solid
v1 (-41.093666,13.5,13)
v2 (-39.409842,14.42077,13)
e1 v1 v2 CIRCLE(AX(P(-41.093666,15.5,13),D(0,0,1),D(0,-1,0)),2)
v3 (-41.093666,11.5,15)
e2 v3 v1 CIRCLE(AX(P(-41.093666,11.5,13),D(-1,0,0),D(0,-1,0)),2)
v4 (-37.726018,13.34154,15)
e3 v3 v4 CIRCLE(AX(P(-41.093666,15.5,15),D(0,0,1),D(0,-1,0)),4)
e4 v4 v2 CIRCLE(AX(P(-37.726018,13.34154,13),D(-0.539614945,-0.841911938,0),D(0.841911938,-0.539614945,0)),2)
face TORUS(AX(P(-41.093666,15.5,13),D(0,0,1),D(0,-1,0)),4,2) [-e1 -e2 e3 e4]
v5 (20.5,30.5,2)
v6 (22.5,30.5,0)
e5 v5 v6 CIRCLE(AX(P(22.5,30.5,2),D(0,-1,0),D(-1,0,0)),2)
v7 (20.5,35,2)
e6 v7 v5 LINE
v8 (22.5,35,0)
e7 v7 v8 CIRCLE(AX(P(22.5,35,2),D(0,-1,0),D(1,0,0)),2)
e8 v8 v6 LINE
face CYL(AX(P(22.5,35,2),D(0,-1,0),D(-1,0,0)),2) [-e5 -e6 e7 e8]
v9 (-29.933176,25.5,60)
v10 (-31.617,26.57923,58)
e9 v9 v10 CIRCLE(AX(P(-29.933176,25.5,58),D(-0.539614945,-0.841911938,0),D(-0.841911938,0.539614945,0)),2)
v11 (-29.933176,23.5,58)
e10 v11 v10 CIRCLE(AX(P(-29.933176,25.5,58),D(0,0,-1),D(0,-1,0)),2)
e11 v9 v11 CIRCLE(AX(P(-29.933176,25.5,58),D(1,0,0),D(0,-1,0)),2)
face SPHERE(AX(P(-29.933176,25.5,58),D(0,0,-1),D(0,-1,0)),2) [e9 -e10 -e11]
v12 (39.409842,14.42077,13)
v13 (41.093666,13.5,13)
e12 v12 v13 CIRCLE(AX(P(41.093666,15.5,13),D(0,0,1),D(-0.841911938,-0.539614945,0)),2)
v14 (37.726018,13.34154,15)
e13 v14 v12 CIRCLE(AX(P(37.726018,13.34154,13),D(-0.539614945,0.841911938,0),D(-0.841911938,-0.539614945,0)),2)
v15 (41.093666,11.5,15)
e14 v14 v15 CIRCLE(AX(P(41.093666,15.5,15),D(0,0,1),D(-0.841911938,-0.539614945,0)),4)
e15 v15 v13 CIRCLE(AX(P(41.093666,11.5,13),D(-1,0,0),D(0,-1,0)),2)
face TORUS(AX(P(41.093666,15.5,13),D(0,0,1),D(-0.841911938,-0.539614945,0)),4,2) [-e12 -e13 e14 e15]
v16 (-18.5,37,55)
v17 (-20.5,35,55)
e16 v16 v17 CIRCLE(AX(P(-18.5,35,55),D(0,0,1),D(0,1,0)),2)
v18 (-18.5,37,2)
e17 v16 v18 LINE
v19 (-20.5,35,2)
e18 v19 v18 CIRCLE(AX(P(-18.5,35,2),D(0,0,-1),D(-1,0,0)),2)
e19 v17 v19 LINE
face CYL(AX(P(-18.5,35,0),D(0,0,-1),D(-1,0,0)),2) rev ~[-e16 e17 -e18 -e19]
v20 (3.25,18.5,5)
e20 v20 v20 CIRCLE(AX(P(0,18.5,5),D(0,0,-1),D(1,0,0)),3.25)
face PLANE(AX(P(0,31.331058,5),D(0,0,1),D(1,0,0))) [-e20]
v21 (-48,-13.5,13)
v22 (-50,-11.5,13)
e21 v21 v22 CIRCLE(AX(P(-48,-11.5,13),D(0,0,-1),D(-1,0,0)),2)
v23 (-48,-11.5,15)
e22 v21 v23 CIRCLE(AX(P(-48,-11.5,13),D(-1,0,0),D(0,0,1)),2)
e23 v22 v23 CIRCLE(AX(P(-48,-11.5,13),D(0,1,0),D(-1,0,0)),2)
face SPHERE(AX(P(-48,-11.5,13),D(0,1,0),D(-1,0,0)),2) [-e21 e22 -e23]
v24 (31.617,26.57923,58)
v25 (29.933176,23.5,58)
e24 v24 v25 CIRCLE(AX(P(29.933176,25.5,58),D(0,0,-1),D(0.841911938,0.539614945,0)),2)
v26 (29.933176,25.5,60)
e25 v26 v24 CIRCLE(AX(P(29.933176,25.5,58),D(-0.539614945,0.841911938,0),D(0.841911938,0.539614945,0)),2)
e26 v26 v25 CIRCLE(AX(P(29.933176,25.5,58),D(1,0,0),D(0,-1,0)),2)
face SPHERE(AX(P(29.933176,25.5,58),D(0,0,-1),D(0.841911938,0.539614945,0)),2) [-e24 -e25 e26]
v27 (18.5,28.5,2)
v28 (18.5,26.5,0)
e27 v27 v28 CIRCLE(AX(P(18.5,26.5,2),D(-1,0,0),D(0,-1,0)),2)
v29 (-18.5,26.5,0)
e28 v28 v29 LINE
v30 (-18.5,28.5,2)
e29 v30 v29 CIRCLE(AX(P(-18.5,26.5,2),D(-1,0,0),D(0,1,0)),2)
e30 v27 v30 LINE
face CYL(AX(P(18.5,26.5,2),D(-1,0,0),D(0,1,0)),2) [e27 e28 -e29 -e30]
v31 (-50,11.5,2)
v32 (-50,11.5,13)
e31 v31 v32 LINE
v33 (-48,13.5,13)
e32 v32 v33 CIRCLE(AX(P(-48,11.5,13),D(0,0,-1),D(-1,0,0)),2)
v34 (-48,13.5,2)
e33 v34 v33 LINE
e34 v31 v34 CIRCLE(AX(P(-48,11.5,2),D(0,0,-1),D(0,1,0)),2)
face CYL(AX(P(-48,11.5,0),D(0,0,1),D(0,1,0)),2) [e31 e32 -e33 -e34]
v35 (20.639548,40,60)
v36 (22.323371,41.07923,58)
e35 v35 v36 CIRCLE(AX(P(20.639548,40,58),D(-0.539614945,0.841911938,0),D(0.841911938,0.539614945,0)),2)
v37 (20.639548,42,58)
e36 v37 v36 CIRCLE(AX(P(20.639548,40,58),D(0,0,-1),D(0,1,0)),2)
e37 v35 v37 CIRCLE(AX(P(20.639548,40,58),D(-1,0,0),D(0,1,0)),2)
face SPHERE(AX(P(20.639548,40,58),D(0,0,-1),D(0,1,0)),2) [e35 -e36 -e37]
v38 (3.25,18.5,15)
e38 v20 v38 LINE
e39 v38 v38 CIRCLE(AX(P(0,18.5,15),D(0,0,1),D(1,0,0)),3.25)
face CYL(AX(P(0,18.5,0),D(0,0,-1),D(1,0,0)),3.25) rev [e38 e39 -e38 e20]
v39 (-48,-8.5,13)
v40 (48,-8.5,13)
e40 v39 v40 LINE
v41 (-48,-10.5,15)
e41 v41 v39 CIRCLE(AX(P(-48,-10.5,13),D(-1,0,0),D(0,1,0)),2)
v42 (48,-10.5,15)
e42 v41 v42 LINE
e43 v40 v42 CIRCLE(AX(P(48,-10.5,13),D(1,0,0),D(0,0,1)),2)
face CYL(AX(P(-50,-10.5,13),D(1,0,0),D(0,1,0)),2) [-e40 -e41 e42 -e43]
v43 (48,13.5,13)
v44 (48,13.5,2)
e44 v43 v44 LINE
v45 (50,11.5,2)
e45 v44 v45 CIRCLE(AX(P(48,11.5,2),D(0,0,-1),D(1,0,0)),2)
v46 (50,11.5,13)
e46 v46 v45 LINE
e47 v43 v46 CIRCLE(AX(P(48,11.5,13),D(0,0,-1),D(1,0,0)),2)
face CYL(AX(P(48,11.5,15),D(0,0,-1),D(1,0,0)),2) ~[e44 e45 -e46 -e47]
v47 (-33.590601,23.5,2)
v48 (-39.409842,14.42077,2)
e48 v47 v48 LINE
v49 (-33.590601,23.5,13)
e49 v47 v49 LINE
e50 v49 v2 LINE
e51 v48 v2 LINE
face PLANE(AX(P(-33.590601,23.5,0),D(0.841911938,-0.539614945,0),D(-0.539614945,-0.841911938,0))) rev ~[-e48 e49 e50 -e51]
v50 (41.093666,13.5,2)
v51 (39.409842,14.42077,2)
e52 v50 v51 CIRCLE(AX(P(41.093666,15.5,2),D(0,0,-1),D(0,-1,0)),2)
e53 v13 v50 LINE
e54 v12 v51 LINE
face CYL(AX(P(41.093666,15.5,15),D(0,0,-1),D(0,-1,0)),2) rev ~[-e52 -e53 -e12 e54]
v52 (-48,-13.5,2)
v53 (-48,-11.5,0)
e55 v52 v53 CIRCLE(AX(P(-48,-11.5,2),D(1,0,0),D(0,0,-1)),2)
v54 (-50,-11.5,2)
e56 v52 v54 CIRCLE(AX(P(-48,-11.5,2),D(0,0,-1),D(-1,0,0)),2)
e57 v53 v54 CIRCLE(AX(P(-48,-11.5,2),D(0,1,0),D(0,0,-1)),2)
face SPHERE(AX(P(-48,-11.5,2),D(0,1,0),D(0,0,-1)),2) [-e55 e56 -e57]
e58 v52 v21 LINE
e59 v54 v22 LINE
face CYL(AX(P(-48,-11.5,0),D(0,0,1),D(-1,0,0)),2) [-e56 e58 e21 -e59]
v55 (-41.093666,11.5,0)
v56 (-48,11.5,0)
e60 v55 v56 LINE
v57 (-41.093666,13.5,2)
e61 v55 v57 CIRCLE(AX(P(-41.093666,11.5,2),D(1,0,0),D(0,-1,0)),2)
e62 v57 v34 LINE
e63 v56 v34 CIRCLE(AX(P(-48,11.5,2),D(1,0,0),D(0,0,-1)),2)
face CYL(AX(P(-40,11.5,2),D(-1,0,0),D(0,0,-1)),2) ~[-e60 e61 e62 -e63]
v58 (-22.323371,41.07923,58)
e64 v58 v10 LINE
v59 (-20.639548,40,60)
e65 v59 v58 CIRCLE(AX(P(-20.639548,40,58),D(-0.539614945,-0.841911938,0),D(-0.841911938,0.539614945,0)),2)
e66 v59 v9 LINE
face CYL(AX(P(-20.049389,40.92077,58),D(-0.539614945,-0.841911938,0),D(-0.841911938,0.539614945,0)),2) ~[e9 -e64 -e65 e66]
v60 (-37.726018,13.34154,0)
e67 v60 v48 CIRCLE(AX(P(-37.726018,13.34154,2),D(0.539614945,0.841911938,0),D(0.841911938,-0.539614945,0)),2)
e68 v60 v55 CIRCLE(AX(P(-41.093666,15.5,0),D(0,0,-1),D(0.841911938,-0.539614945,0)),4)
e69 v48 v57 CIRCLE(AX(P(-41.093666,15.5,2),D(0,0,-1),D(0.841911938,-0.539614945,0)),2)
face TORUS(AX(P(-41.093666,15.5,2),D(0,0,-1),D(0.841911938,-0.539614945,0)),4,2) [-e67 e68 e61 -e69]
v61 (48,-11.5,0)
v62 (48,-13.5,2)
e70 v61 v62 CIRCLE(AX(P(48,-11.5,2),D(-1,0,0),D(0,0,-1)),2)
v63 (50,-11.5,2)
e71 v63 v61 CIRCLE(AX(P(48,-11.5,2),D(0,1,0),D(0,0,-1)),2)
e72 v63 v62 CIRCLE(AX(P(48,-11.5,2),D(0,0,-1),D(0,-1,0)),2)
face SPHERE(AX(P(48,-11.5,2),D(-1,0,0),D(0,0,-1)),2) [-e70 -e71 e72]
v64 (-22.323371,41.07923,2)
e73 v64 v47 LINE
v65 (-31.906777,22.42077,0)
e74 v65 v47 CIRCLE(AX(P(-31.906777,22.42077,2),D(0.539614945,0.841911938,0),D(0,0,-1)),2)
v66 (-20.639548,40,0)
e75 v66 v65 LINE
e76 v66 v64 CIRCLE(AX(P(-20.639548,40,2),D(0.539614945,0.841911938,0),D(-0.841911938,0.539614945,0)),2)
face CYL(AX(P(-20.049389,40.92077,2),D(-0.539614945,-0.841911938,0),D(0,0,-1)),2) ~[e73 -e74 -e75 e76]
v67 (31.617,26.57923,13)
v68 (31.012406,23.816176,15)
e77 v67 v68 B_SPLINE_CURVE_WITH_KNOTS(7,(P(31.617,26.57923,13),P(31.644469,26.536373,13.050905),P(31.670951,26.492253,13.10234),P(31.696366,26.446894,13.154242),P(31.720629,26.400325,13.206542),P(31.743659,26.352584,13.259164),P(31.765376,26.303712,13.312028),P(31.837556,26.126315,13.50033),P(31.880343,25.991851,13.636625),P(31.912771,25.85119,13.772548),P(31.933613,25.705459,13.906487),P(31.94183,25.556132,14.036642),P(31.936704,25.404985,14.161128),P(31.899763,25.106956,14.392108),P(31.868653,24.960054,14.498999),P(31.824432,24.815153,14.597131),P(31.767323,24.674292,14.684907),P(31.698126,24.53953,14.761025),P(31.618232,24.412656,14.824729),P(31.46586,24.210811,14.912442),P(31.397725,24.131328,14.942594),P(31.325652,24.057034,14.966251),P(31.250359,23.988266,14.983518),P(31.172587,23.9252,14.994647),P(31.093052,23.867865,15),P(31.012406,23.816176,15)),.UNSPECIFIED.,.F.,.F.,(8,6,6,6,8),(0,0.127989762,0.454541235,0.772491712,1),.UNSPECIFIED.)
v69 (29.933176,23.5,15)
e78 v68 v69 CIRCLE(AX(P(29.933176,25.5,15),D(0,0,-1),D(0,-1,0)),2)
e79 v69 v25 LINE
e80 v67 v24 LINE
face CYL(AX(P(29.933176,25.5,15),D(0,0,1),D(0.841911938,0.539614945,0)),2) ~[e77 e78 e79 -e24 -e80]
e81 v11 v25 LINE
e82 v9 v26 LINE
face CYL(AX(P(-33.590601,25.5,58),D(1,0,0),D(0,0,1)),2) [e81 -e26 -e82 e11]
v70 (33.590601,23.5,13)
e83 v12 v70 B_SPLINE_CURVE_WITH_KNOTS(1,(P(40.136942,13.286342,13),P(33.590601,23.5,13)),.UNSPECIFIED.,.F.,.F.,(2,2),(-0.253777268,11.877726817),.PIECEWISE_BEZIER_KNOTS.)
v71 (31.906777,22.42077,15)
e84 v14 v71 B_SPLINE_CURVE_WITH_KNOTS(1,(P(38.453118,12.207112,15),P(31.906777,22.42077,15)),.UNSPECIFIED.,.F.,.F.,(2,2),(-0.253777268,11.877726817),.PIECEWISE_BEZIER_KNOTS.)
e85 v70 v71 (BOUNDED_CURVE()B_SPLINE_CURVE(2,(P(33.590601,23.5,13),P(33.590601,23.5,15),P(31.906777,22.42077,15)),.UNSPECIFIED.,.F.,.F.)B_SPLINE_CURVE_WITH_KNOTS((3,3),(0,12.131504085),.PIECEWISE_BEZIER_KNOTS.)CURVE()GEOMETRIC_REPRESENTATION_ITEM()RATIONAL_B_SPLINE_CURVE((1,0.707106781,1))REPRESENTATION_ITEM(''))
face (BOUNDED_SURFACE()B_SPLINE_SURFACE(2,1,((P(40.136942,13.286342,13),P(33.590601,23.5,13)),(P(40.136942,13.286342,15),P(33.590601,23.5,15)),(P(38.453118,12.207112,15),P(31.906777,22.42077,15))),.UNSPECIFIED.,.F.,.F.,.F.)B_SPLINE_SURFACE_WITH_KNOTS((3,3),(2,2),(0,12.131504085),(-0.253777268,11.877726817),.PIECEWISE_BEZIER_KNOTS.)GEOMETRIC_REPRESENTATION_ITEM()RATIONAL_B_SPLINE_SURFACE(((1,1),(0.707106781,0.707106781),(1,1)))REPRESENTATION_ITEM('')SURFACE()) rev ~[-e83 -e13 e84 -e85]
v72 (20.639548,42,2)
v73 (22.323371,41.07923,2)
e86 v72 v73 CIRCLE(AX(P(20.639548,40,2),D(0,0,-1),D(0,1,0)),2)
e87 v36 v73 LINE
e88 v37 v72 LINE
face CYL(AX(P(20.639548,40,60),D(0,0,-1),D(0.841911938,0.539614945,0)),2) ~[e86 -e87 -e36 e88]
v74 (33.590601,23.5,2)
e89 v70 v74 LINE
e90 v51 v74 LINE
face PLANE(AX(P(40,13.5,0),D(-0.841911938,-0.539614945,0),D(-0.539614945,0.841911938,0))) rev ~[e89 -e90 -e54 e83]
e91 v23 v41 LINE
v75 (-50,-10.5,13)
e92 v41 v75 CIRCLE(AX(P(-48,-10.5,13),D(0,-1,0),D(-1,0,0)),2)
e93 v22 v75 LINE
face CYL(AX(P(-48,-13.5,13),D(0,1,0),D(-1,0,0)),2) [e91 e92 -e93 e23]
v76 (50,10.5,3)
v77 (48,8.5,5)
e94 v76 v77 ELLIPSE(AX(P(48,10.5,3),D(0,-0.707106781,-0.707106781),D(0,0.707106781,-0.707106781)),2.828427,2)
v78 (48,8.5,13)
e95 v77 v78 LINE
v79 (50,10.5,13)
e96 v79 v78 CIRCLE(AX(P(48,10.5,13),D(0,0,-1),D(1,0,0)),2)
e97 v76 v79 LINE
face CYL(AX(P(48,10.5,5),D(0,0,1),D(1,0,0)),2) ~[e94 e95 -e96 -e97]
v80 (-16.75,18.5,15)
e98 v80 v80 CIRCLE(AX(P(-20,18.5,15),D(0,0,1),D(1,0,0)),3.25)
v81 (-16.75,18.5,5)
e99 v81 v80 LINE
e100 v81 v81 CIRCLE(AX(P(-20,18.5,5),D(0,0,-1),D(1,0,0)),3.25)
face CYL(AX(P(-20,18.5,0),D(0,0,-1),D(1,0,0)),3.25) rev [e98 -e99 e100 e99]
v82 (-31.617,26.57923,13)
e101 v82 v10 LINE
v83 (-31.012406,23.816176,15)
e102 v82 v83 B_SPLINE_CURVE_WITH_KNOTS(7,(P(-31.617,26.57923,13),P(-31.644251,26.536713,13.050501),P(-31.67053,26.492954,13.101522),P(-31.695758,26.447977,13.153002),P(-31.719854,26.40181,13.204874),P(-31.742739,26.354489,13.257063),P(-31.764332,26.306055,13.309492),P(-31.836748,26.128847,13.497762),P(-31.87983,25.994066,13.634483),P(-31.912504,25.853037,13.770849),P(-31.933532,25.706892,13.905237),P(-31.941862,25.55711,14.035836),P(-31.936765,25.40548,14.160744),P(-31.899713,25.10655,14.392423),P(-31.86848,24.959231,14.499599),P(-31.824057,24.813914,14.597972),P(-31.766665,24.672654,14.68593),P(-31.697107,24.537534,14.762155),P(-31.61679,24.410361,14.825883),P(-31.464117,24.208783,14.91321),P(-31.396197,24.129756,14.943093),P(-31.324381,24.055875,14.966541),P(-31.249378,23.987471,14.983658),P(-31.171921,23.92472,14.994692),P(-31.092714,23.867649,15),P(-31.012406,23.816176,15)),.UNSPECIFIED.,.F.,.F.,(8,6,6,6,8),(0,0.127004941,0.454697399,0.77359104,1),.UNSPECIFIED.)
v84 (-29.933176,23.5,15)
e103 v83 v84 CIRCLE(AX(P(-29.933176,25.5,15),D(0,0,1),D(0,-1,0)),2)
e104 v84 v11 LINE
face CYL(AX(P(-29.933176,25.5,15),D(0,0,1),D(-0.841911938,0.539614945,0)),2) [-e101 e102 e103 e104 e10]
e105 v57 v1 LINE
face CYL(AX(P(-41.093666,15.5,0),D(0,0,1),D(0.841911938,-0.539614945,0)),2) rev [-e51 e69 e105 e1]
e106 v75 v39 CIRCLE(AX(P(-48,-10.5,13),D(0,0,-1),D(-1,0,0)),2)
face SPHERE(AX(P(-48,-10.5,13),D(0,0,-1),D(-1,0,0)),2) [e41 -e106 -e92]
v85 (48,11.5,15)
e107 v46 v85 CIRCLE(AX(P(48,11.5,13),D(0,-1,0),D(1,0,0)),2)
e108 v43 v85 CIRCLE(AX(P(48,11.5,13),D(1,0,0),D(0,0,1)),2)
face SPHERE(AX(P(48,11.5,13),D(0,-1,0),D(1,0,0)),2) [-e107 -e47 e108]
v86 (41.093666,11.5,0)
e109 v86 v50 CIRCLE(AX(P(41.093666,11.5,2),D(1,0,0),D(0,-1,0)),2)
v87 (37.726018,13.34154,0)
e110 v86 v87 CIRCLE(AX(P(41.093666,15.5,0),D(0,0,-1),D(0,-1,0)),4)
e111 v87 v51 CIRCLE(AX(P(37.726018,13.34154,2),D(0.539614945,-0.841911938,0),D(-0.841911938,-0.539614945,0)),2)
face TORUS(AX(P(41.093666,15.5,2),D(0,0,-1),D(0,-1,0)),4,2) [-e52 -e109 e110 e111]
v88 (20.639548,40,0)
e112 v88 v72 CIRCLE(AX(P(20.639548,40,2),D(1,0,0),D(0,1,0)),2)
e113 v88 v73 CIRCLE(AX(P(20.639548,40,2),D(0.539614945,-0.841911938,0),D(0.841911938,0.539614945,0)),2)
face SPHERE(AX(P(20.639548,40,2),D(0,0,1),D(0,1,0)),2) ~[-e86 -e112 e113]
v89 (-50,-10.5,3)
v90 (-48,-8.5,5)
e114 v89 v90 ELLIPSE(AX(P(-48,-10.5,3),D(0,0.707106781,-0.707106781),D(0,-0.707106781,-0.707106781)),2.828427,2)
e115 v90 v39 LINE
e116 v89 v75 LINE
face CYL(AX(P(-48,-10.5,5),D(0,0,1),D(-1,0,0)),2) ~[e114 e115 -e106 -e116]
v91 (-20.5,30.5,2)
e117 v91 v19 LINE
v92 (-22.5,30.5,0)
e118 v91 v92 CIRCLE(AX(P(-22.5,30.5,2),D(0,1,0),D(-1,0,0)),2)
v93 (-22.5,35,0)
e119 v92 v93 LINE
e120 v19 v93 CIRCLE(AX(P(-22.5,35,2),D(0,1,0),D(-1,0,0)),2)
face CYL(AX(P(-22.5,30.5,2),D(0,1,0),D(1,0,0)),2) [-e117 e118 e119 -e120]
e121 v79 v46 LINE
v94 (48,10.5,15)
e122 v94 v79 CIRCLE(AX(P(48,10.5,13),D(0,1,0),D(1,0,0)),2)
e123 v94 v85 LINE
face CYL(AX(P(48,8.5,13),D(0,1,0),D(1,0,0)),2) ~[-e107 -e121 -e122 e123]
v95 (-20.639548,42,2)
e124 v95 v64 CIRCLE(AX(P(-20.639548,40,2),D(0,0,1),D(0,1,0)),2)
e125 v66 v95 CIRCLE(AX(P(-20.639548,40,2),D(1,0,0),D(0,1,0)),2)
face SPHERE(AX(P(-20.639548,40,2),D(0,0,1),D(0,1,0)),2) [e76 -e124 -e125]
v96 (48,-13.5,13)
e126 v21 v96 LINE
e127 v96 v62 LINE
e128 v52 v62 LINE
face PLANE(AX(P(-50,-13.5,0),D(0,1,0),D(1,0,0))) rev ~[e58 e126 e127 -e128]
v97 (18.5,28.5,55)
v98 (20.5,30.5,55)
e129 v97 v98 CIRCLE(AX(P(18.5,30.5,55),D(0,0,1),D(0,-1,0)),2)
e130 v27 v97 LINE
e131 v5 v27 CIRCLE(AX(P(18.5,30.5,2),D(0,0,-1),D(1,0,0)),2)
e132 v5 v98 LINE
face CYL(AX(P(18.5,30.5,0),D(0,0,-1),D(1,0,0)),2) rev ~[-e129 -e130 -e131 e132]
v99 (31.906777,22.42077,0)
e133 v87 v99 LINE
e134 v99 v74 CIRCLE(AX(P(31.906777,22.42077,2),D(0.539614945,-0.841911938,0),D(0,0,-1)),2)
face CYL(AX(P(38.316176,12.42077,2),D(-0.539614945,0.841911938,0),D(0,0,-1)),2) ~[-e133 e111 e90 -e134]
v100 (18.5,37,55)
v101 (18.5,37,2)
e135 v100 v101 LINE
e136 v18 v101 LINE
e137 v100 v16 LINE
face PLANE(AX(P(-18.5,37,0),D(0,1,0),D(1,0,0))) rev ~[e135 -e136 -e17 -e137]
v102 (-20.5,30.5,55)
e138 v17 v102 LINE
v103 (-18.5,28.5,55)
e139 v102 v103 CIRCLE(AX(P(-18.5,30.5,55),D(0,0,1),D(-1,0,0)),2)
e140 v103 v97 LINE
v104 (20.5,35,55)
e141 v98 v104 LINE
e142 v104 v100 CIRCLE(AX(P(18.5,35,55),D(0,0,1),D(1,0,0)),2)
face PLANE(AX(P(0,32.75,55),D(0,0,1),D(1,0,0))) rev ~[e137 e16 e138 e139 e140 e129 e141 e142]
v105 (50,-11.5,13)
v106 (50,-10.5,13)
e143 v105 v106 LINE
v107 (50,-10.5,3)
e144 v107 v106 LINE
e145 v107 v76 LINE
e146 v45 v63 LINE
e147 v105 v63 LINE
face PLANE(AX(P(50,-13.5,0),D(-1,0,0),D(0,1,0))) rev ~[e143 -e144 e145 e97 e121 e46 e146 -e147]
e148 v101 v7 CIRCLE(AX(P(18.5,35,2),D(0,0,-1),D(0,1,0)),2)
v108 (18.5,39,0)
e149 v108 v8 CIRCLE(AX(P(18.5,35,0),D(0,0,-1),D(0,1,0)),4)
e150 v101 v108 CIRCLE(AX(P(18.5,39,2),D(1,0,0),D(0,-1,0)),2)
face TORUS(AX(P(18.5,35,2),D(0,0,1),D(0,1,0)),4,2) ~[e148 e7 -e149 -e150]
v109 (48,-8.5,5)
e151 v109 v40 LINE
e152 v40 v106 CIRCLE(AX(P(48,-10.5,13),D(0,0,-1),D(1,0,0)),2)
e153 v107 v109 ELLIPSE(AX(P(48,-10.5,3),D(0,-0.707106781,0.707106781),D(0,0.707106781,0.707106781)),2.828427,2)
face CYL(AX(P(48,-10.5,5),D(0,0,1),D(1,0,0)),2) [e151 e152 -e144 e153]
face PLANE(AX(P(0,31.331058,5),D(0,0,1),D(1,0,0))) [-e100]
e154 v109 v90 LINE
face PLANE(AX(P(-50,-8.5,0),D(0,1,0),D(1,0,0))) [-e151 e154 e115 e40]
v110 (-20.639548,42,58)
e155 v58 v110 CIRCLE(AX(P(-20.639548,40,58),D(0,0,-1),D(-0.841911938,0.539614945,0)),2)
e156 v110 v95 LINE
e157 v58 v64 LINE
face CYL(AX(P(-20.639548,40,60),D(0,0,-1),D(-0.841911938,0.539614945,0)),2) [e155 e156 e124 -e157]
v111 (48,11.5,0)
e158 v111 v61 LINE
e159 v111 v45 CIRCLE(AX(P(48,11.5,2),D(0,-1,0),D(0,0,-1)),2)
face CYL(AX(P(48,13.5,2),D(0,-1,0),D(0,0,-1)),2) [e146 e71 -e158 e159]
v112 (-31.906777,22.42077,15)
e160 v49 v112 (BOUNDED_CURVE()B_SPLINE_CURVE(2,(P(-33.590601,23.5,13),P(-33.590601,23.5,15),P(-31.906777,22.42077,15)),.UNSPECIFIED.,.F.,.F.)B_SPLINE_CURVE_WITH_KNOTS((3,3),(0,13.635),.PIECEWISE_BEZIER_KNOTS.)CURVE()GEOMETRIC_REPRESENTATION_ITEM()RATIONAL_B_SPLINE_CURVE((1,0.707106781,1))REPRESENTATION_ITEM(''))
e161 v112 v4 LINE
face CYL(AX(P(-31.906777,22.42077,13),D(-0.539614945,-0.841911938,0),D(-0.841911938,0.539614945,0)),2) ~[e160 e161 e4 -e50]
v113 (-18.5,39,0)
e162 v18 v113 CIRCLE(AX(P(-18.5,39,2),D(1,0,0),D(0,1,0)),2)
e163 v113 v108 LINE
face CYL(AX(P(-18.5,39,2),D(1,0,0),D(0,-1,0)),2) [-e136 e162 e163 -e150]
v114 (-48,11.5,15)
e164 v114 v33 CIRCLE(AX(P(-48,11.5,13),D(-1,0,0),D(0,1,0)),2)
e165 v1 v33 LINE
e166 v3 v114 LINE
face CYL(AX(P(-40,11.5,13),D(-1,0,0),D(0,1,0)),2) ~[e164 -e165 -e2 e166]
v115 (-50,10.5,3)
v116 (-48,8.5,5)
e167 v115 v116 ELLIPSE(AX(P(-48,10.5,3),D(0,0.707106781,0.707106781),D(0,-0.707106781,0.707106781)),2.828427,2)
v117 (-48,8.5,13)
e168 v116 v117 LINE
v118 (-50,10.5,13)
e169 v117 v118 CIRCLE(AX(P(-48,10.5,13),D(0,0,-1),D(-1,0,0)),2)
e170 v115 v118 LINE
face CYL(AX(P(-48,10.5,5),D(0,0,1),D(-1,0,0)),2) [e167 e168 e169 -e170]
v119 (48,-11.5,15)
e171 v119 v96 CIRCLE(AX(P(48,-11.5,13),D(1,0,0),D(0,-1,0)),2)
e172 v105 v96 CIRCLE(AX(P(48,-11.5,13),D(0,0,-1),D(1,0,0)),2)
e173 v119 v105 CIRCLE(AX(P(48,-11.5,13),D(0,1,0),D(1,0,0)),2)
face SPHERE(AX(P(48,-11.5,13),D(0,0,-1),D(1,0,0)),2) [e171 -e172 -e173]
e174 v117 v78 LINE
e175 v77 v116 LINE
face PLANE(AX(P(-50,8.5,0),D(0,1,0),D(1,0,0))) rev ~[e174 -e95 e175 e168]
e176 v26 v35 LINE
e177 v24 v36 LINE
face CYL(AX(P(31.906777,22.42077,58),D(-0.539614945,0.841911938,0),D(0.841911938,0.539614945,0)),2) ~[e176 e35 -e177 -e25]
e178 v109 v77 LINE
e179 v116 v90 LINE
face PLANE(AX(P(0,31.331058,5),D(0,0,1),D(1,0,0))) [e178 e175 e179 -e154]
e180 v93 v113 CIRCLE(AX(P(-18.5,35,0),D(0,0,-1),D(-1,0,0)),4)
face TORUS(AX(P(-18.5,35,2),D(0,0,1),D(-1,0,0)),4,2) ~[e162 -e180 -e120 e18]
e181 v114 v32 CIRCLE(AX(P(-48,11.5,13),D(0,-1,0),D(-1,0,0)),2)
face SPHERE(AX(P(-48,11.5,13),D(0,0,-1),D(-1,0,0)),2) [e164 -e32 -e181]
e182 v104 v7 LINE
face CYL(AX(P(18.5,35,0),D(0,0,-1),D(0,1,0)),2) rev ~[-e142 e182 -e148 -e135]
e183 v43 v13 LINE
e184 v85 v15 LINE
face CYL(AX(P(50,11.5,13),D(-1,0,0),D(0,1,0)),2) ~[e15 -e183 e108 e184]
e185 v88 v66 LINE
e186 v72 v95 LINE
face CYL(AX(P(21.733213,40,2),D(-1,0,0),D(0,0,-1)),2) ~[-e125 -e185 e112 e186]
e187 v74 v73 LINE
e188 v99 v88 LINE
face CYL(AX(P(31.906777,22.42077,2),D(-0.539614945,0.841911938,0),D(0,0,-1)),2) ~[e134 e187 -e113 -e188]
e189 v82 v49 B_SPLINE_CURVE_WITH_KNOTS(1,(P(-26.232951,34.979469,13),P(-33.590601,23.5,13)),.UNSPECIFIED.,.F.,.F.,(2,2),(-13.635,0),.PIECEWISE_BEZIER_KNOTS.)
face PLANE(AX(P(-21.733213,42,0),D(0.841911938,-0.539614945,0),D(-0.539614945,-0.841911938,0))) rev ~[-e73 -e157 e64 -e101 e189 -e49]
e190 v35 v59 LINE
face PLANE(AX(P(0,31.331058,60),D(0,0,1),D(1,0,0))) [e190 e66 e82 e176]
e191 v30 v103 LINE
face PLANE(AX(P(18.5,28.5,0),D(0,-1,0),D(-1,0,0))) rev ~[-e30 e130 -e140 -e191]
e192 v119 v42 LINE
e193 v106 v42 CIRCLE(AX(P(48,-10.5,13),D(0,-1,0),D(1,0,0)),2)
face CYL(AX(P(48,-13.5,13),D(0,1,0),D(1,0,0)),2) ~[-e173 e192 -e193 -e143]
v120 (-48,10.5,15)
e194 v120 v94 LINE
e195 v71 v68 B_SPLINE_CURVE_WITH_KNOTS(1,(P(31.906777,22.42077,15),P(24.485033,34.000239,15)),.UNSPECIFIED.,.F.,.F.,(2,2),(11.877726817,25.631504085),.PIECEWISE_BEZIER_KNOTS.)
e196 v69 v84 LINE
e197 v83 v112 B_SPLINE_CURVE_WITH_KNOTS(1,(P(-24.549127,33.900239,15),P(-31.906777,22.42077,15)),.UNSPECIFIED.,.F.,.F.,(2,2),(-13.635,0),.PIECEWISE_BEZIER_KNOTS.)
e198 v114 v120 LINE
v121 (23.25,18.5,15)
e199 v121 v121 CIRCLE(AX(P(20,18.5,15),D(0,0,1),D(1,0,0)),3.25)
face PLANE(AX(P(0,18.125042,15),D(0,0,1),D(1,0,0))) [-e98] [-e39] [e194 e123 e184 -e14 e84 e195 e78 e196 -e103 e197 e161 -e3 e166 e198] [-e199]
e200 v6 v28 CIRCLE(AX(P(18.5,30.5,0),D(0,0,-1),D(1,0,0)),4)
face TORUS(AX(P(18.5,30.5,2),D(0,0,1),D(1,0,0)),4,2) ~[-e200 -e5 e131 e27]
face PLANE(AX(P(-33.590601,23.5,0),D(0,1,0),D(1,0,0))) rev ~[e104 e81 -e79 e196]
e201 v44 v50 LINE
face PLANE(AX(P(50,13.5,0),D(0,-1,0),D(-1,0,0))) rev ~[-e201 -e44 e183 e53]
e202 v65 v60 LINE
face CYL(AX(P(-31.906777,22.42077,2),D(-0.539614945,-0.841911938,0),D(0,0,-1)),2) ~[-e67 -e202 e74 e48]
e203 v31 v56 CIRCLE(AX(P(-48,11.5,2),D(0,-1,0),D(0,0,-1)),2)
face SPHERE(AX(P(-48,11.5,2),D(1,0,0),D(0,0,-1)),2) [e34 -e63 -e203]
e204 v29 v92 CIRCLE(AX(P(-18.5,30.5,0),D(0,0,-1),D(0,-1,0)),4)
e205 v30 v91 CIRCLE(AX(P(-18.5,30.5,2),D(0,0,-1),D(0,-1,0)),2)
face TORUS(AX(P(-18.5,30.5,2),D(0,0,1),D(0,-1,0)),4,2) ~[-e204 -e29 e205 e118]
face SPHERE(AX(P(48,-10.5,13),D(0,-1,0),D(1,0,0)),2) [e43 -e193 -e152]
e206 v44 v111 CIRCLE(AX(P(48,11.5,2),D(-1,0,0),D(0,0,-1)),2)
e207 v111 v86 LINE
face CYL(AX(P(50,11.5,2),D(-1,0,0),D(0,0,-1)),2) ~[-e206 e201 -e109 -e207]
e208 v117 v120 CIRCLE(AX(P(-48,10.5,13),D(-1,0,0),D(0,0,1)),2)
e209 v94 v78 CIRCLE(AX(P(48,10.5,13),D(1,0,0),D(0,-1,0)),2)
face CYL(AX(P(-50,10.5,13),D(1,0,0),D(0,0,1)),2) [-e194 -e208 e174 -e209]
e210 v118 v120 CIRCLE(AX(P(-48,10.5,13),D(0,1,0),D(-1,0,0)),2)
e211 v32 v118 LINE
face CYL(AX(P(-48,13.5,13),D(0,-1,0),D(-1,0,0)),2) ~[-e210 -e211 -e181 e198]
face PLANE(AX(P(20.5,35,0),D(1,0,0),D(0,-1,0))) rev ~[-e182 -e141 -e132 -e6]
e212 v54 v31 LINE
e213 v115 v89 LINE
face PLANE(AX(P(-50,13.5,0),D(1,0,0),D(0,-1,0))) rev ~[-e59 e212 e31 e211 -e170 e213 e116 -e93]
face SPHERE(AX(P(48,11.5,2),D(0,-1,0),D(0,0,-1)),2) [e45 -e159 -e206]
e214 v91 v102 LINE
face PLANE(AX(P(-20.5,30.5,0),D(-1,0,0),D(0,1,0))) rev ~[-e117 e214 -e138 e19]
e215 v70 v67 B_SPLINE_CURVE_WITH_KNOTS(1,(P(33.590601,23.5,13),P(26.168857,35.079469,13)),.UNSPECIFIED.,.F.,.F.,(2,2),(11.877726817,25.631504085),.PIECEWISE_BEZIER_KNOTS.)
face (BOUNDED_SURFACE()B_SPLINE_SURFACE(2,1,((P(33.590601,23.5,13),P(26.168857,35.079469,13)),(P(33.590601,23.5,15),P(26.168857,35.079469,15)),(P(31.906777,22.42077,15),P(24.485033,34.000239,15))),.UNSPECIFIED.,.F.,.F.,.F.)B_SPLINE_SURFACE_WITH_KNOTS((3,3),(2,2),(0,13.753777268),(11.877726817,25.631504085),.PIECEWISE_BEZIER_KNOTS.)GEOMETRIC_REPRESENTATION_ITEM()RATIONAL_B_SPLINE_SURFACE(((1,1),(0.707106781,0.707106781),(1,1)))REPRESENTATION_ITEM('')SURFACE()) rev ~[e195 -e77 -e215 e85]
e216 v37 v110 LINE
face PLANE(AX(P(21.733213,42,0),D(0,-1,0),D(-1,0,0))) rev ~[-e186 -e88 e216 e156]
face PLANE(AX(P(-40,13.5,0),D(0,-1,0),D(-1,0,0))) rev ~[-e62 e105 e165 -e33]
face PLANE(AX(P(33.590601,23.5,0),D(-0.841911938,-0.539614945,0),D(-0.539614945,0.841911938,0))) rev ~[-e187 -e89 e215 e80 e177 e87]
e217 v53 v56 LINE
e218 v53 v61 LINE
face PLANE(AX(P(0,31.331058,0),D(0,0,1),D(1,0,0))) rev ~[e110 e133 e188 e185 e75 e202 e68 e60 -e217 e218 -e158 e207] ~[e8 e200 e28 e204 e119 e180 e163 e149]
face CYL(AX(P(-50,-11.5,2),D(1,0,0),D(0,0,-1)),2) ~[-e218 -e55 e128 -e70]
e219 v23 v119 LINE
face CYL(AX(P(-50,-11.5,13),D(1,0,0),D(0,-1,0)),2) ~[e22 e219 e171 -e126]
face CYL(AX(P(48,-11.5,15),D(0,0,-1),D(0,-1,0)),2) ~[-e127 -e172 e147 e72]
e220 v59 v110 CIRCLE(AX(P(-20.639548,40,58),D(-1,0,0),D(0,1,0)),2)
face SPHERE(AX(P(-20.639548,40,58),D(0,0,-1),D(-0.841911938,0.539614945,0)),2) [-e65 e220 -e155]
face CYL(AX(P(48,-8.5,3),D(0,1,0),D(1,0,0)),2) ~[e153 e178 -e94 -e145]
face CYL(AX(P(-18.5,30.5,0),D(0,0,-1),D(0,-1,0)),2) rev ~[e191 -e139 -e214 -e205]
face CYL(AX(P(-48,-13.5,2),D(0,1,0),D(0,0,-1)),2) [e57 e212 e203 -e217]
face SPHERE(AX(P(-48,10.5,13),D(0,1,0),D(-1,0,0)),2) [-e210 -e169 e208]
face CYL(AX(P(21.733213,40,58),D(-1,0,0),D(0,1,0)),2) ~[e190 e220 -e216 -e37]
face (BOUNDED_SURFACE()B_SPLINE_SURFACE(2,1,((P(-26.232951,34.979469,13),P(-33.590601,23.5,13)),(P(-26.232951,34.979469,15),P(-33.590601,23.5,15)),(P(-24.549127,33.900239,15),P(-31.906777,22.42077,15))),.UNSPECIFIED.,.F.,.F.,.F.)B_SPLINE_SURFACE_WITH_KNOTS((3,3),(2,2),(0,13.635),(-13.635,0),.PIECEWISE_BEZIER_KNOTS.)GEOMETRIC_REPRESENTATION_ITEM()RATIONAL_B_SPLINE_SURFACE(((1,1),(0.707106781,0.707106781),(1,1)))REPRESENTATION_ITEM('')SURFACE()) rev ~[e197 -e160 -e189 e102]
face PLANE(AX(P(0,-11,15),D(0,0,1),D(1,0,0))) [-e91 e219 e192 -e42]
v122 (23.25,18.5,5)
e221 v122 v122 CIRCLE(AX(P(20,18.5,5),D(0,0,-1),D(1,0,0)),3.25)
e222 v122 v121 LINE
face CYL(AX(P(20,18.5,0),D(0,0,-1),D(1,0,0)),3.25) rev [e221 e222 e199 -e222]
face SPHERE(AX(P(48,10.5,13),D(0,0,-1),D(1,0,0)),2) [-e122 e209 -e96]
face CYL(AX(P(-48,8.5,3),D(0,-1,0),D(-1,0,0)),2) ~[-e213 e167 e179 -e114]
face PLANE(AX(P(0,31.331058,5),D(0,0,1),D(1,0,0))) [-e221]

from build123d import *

# Parameters (mm, degrees)
F0_R     = 3.25
F0_W     = 100
F0_H     = 17
F0_H_2   = 5
F1_DEPTH = 5
F2_DEPTH = 15
F3_DEPTH = 60
F4_START = 55
F4_DEPTH = 5
F5_R     = 2


with BuildPart() as f1:
    # F0 (on Top) → F1 (new body)
    with BuildSketch(Plane.XY):
        Polygon((-21.7332131192, 42), (-33.5906010945, 23.5), (33.5906010945, 23.5), (21.7332131192, 42), align=None)
        with BuildLine():
            ThreePointArc((-20.5, 35), (-19.9142135624, 36.4142135624), (-18.5, 37))
            Line((-18.5, 37), (18.5, 37))
            ThreePointArc((18.5, 37), (19.9142135624, 36.4142135624), (20.5, 35))
            Line((20.5, 35), (20.5, 30.5))
            ThreePointArc((20.5, 30.5), (19.9142135624, 29.0857864376), (18.5, 28.5))
            Line((18.5, 28.5), (-18.5, 28.5))
            ThreePointArc((-18.5, 28.5), (-19.9142135624, 29.0857864376), (-20.5, 30.5))
            Line((-20.5, 30.5), (-20.5, 35))
        make_face(mode=Mode.SUBTRACT)
        Polygon((-33.5906010945, 23.5), (-40, 13.5), (40, 13.5), (33.5906010945, 23.5), align=None)
        with Locations((-20, 18.5)):
            Circle(F0_R, mode=Mode.SUBTRACT)
        with Locations((0, 18.5)):
            Circle(F0_R, mode=Mode.SUBTRACT)
        with Locations((20, 18.5)):
            Circle(F0_R, mode=Mode.SUBTRACT)
        with Locations((-20, 18.5)):
            Circle(F0_R)
        with Locations((0, 18.5)):
            Circle(F0_R)
        with Locations((20, 18.5)):
            Circle(F0_R)
        Polygon((-40, 13.5), (-50, 13.5), (-50, 8.5), (50, 8.5), (50, 13.5), (40, 13.5), align=None)
        Rectangle(F0_W, F0_H)
        with Locations((0, -11)):
            Rectangle(F0_W, F0_H_2)
    extrude(amount=F1_DEPTH)

    # F0 (on Top) → F2 (join)
    with BuildSketch(Plane.XY):
        Polygon((-33.5906010945, 23.5), (-40, 13.5), (40, 13.5), (33.5906010945, 23.5), align=None)
        with Locations((-20, 18.5)):
            Circle(F0_R, mode=Mode.SUBTRACT)
        with Locations((0, 18.5)):
            Circle(F0_R, mode=Mode.SUBTRACT)
        with Locations((20, 18.5)):
            Circle(F0_R, mode=Mode.SUBTRACT)
        Polygon((-40, 13.5), (-50, 13.5), (-50, 8.5), (50, 8.5), (50, 13.5), (40, 13.5), align=None)
        with Locations((0, -11)):
            Rectangle(F0_W, F0_H_2)
    extrude(amount=F2_DEPTH)

    # F0 (on Top) → F3 (join)
    with BuildSketch(Plane.XY):
        Polygon((-21.7332131192, 42), (-33.5906010945, 23.5), (33.5906010945, 23.5), (21.7332131192, 42), align=None)
        with BuildLine():
            ThreePointArc((-20.5, 35), (-19.9142135624, 36.4142135624), (-18.5, 37))
            Line((-18.5, 37), (18.5, 37))
            ThreePointArc((18.5, 37), (19.9142135624, 36.4142135624), (20.5, 35))
            Line((20.5, 35), (20.5, 30.5))
            ThreePointArc((20.5, 30.5), (19.9142135624, 29.0857864376), (18.5, 28.5))
            Line((18.5, 28.5), (-18.5, 28.5))
            ThreePointArc((-18.5, 28.5), (-19.9142135624, 29.0857864376), (-20.5, 30.5))
            Line((-20.5, 30.5), (-20.5, 35))
        make_face(mode=Mode.SUBTRACT)
    extrude(amount=F3_DEPTH)

    # F0 (on Top) → F4 (join)
    with BuildSketch(Plane.XY.offset(F4_START)):
        with BuildLine():
            Line((18.5, 37), (-18.5, 37))
            ThreePointArc((-18.5, 37), (-19.9142135624, 36.4142135624), (-20.5, 35))
            Line((-20.5, 35), (-20.5, 30.5))
            ThreePointArc((-20.5, 30.5), (-19.9142135624, 29.0857864376), (-18.5, 28.5))
            Line((-18.5, 28.5), (18.5, 28.5))
            ThreePointArc((18.5, 28.5), (19.9142135624, 29.0857864376), (20.5, 30.5))
            Line((20.5, 30.5), (20.5, 35))
            ThreePointArc((20.5, 35), (19.9142135624, 36.4142135624), (18.5, 37))
        make_face()
    extrude(amount=F4_DEPTH)

    # F5
    f5_edges = [f1.edges().sort_by_distance(p)[0] for p in [
        (0, 42, 0),
        (-30.866607, 27.75, 0),
        (-45, 13.5, 0),
        (-50, 0, 0),
        (0, -13.5, 0),
        (50, 0, 0),
        (45, 13.5, 0),
        (30.866607, 27.75, 0),
        (-19.914214, 36.414214, 0),
        (0, 37, 0),
        (19.914214, 36.414214, 0),
        (20.5, 32.75, 0),
        (19.914214, 29.085786, 0),
        (0, 28.5, 0),
        (-19.914214, 29.085786, 0),
        (-20.5, 32.75, 0),
        (-21.733213, 42, 30),
        (-27.661907, 32.75, 60),
        (-33.590601, 23.5, 37.5),
        (-36.795301, 18.5, 15),
        (-40, 13.5, 7.5),
        (-50, 13.5, 7.5),
        (-50, 11, 15),
        (-50, 8.5, 10),
        (-50, 0, 5),
        (-50, -8.5, 10),
        (-50, -11, 15),
        (-50, -13.5, 7.5),
        (40, 13.5, 7.5),
        (36.795301, 18.5, 15),
        (33.590601, 23.5, 37.5),
        (27.661907, 32.75, 60),
        (21.733213, 42, 30),
        (50, -13.5, 7.5),
        (50, -11, 15),
        (50, -8.5, 10),
        (50, 0, 5),
        (50, 8.5, 10),
        (50, 11, 15),
        (50, 13.5, 7.5),
        (0, 42, 60),
        (0, 23.5, 60),
        (0, -8.5, 15),
        (0, -13.5, 15),
        (0, 8.5, 15),
        (45, 13.5, 15),
        (-45, 13.5, 15),
    ]]
    fillet(f5_edges, radius=F5_R)


solid = f1.part
